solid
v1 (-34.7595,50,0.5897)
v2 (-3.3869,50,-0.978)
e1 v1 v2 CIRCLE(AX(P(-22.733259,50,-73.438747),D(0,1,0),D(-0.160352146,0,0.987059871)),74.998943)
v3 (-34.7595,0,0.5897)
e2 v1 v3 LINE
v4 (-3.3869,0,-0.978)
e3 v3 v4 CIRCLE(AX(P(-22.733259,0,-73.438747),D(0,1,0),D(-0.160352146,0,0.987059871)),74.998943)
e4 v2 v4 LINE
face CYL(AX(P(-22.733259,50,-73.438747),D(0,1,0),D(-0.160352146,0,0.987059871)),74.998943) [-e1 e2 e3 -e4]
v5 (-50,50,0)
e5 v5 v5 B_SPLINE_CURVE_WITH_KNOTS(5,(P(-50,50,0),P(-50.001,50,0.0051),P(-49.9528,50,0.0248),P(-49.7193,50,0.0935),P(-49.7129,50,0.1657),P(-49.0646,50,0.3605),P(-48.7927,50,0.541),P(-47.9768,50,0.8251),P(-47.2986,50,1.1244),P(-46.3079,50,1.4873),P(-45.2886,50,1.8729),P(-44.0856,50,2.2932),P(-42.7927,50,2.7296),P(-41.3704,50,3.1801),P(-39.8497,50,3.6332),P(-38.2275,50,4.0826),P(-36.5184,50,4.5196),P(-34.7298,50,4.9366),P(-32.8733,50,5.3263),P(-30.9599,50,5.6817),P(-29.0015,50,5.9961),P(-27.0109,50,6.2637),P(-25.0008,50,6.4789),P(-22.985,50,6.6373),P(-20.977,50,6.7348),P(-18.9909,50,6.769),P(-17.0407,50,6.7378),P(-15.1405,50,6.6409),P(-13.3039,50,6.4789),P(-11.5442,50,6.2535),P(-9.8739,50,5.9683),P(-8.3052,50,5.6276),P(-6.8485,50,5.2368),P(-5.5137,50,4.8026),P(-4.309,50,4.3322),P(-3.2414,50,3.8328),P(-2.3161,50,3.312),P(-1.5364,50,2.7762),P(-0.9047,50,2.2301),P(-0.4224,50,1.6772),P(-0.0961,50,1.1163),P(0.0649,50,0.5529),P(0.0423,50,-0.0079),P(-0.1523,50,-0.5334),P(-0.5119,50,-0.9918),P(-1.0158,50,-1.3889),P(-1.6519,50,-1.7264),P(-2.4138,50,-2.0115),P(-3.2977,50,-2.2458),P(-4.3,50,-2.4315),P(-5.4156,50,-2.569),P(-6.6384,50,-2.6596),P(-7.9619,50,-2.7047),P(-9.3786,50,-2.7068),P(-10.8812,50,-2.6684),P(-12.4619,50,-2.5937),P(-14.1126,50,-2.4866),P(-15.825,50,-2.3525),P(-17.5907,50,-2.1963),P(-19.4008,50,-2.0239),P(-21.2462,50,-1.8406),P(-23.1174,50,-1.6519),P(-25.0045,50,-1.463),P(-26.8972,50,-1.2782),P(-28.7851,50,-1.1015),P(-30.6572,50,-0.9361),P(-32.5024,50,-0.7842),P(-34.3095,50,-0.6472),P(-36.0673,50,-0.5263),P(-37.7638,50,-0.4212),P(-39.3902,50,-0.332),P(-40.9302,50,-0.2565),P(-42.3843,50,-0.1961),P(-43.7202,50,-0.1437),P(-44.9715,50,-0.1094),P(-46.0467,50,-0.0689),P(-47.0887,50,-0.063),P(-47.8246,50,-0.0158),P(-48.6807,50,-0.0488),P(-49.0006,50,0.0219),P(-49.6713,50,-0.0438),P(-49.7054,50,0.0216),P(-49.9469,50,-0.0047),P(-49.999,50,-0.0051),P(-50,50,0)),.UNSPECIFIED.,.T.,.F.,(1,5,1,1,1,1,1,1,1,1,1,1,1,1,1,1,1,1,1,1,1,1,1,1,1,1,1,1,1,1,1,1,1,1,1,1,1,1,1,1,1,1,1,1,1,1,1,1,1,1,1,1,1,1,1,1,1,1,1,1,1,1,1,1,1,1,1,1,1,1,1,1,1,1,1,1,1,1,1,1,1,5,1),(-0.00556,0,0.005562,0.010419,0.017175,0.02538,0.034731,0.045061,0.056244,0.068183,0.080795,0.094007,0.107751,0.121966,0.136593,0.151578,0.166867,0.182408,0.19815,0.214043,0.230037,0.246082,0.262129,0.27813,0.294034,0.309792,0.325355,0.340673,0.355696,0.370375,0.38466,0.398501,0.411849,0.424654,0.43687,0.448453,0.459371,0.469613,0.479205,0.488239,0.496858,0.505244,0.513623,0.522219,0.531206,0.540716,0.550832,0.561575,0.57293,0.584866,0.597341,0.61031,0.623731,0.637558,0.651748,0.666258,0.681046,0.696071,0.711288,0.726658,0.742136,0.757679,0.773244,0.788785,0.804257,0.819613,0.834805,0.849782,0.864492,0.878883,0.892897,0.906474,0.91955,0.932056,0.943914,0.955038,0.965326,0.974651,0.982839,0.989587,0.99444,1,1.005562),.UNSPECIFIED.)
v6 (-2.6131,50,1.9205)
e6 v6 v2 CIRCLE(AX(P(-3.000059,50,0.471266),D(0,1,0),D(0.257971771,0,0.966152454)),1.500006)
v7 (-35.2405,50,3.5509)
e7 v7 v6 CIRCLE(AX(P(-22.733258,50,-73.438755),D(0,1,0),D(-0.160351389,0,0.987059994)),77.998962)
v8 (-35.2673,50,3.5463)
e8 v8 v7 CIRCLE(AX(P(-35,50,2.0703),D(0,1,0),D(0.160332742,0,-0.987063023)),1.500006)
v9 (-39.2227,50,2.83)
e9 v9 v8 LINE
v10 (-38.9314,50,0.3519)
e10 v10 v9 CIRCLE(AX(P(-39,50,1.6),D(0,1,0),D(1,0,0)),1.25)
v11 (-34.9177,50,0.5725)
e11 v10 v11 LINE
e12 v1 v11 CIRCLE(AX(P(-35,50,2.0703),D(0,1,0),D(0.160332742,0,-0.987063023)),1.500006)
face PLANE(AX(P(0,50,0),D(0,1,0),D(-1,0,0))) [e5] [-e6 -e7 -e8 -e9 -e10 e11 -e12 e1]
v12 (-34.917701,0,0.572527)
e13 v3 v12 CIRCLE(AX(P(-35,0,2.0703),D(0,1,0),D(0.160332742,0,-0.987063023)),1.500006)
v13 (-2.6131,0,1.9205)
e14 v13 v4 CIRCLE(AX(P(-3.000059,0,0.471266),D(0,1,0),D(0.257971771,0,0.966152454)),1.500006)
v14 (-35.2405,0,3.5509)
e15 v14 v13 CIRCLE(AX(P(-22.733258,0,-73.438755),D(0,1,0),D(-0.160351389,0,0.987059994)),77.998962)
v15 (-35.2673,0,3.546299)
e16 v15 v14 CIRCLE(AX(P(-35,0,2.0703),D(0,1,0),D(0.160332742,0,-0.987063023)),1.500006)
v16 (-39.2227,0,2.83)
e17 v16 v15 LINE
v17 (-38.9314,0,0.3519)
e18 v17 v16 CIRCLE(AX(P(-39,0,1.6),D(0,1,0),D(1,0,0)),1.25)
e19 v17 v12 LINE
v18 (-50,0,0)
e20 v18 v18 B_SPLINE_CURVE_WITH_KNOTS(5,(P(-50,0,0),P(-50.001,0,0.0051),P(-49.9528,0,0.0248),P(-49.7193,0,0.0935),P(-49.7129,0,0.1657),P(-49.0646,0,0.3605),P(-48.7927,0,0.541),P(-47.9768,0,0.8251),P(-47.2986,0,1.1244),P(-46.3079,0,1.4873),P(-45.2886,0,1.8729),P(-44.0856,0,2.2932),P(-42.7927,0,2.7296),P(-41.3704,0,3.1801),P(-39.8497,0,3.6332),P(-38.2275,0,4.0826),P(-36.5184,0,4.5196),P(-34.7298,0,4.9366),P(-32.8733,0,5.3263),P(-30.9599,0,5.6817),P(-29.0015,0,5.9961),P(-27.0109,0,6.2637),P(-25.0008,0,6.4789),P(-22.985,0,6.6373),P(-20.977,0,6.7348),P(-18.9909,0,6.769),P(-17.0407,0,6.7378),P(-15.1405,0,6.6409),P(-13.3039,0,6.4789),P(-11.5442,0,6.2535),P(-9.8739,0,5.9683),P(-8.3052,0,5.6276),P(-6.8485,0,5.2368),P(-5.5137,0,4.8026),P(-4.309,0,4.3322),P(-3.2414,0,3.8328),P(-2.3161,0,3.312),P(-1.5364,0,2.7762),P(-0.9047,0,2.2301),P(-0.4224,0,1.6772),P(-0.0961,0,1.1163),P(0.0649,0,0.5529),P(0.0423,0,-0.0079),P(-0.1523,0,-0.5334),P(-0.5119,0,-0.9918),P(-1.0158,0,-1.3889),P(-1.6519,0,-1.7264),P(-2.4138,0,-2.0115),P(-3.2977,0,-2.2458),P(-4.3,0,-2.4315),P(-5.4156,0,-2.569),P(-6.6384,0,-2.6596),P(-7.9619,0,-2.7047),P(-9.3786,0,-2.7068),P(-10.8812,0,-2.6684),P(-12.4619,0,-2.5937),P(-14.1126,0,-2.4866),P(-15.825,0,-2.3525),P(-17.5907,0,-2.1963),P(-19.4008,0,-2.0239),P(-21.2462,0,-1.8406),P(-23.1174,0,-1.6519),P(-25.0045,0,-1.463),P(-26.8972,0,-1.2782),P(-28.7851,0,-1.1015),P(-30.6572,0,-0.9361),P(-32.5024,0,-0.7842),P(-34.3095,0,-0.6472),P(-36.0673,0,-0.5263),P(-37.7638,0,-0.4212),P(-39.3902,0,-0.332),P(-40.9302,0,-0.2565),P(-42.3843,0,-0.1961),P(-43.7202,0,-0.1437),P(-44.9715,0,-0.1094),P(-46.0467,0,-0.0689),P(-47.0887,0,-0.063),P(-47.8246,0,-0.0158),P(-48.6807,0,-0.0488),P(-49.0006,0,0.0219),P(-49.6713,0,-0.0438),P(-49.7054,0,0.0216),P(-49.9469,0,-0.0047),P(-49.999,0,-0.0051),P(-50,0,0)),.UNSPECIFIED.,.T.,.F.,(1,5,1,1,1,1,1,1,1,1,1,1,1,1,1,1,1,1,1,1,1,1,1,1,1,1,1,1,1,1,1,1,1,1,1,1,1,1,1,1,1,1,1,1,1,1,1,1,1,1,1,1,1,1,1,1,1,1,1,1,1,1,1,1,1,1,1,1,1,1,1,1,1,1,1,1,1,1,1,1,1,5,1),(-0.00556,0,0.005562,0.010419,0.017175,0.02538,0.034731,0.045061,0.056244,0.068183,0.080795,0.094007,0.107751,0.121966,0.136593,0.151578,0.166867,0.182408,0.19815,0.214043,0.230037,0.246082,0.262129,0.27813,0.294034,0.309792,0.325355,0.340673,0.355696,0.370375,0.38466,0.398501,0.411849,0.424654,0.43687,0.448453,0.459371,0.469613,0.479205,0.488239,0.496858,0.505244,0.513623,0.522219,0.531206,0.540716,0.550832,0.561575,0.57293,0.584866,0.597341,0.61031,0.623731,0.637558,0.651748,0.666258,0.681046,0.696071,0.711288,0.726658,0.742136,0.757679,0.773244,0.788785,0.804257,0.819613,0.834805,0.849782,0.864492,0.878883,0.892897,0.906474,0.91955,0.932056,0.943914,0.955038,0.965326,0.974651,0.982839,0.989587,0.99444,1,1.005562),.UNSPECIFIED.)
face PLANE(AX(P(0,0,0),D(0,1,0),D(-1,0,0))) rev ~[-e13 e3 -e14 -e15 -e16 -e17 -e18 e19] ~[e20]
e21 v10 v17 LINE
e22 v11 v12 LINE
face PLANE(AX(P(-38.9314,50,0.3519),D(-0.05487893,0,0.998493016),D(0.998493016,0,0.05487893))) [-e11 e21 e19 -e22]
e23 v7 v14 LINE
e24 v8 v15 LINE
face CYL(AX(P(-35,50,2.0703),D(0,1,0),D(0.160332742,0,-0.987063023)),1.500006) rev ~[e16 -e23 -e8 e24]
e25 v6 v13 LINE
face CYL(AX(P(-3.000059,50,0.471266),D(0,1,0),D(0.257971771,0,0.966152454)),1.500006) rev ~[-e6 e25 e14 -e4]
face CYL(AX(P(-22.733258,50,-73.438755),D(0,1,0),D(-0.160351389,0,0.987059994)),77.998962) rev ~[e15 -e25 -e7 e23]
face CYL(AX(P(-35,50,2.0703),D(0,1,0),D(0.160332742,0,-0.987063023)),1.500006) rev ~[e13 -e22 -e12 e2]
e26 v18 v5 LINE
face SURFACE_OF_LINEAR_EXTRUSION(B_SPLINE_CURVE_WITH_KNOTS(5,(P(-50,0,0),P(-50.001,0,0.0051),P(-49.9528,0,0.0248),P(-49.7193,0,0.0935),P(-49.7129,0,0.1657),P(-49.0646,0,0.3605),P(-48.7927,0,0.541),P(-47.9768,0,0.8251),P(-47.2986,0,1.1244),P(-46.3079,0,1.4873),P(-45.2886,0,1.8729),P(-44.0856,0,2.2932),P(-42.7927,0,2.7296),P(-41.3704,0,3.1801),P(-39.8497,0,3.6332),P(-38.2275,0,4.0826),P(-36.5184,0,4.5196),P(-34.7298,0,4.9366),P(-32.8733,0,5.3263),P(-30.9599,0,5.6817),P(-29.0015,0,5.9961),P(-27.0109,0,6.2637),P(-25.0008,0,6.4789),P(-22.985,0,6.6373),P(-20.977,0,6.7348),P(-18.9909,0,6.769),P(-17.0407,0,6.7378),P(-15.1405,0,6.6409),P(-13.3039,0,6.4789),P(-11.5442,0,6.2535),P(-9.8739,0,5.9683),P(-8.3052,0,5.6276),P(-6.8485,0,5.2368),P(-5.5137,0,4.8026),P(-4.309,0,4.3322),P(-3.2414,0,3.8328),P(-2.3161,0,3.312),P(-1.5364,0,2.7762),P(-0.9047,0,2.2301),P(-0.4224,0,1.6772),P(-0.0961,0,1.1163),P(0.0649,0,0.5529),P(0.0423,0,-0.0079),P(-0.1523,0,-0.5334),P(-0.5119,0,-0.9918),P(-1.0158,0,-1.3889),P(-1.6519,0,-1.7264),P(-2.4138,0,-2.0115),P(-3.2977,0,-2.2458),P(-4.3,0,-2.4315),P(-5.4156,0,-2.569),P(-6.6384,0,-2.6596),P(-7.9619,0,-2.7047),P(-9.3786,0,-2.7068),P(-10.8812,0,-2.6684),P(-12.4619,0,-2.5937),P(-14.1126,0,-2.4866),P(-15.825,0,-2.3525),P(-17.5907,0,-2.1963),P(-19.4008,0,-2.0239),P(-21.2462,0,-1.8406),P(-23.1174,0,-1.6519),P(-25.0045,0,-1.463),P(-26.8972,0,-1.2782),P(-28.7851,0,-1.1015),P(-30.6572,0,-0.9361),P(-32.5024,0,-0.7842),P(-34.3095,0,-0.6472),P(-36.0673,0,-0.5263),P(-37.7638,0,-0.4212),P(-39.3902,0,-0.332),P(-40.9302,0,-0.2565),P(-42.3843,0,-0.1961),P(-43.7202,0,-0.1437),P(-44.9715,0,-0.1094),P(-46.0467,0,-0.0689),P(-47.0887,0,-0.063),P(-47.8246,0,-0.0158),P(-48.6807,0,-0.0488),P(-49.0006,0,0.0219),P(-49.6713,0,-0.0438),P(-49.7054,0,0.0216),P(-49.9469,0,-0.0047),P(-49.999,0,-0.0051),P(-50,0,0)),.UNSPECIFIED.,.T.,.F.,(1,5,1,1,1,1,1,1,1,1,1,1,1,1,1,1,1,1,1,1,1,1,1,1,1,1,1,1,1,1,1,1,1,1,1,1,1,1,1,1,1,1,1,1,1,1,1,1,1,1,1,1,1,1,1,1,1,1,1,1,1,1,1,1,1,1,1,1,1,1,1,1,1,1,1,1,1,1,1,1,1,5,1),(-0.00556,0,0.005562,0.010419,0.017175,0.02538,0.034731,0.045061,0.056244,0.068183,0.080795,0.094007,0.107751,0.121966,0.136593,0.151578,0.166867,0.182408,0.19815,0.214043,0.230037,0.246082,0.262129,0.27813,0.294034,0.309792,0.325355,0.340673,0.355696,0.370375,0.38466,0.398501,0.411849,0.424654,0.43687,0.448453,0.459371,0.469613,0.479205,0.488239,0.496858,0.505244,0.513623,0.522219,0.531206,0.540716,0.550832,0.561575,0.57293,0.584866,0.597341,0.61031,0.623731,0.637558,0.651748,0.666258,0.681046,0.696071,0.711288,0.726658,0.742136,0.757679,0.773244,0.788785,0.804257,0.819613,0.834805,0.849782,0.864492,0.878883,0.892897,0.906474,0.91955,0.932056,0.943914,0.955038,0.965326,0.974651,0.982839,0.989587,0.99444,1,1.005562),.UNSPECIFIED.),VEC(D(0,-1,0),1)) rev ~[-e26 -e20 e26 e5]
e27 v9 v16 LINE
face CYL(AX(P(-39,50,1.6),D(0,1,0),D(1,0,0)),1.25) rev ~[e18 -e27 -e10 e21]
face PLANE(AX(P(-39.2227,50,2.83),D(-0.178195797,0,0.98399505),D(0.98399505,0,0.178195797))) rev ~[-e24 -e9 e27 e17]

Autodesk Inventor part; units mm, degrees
ref_plane "YZ Plane" through (0, 0, 0) normal (1, 0, 0) x (0, 1, 0)
ref_plane "XZ Plane" through (0, 0, 0) normal (0, 1, 0) x (-1, 0, 0)
ref_plane "XY Plane" through (0, 0, 0) normal (0, 0, 1) x (1, 0, 0)
sketch "草圖2" plane through (0, 0, 0) normal (0, 1, 0) x (-1, 0, 0)
  spline S0 degree 5 poles (50, 0) (50.001, 0.0051) (49.9528, 0.0248) (49.7193, 0.0935) (49.7129, 0.1657) (49.0646, 0.3605) (48.7927, 0.541) (47.9768, 0.8251) (47.2986, 1.1244) (46.3079, 1.4873) (45.2886, 1.8729) (44.0856, 2.2932) (42.7927, 2.7296) (41.3704, 3.1801) (39.8497, 3.6332) (38.2275, 4.0826) (36.5184, 4.5196) (34.7298, 4.9366) (32.8733, 5.3263) (30.9599, 5.6817) (29.0015, 5.9961) (27.0109, 6.2637) (25.0008, 6.4789) (22.985, 6.6373) (20.977, 6.7348) (18.9909, 6.769) (17.0407, 6.7378) (15.1405, 6.6409) (13.3039, 6.4789) (11.5442, 6.2535) (9.8739, 5.9683) (8.3052, 5.6276) (6.8485, 5.2368) (5.5137, 4.8026) (4.309, 4.3322) (3.2414, 3.8328) (2.3161, 3.312) (1.5364, 2.7762) (0.9047, 2.2301) (0.4224, 1.6772) (0.0961, 1.1163) (-0.0649, 0.5529) (-0.0423, -0.0079) (0.1523, -0.5334) (0.5119, -0.9918) (1.0158, -1.3889) (1.6519, -1.7264) (2.4138, -2.0115) (3.2977, -2.2458) (4.3, -2.4315) (5.4156, -2.569) (6.6384, -2.6596) (7.9619, -2.7047) (9.3786, -2.7068) (10.8812, -2.6684) (12.4619, -2.5937) (14.1126, -2.4866) (15.825, -2.3525) (17.5907, -2.1963) (19.4008, -2.0239) (21.2462, -1.8406) (23.1174, -1.6519) (25.0045, -1.463) (26.8972, -1.2782) (28.7851, -1.1015) (30.6572, -0.9361) (32.5024, -0.7842) (34.3095, -0.6472) (36.0673, -0.5263) (37.7638, -0.4212) (39.3902, -0.332) (40.9302, -0.2565) (42.3843, -0.1961) (43.7202, -0.1437) (44.9715, -0.1094) (46.0467, -0.0689) (47.0887, -0.063) (47.8246, -0.0158) (48.6807, -0.0488) (49.0006, 0.0219) (49.6713, -0.0438) (49.7054, 0.0216) (49.9469, -0.0047) (49.999, -0.0051) (50, 0) knots 0 0 0 0 0 0 0.005562 0.010419 0.017175 0.02538 0.034731 0.045061 0.056244 0.068183 0.080795 0.094007 0.107751 0.121966 0.136593 0.151578 0.166867 0.182408 0.19815 0.214043 0.230037 0.246082 0.262129 0.27813 0.294034 0.309792 0.325355 0.340673 0.355696 0.370375 0.38466 0.398501 0.411849 0.424654 0.43687 0.448453 0.459371 0.469613 0.479205 0.488239 0.496858 0.505244 0.513623 0.522219 0.531206 0.540716 0.550832 0.561575 0.57293 0.584866 0.597341 0.61031 0.623731 0.637558 0.651748 0.666258 0.681046 0.696071 0.711288 0.726658 0.742136 0.757679 0.773244 0.788785 0.804257 0.819613 0.834805 0.849782 0.864492 0.878883 0.892897 0.906474 0.91955 0.932056 0.943914 0.955038 0.965326 0.974651 0.982839 0.989587 0.99444 1 1 1 1 1 1
  point P0 (49.7052, 0.1268)
  point P1 (49.3378, 0.2828)
  point P2 (48.8255, 0.4967)
  point P3 (48.1705, 0.7643)
  point P4 (47.3758, 1.0802)
  point P5 (46.4449, 1.4382)
  point P6 (45.382, 1.8315)
  point P7 (44.1923, 2.2525)
  point P8 (42.8818, 2.6935)
  point P9 (41.4571, 3.1465)
  point P10 (39.9258, 3.6031)
  point P11 (38.2963, 4.0553)
  point P12 (36.5777, 4.4952)
  point P13 (34.7799, 4.9149)
  point P14 (32.9136, 5.3069)
  point P15 (30.9903, 5.6643)
  point P16 (29.0217, 5.9802)
  point P17 (27.0206, 6.2489)
  point P18 (25, 6.4646)
  point P19 (22.9736, 6.6229)
  point P20 (20.9552, 6.7199)
  point P21 (18.959, 6.7527)
  point P22 (16.9991, 6.7195)
  point P23 (15.0896, 6.6199)
  point P24 (13.2444, 6.4545)
  point P25 (11.477, 6.2251)
  point P26 (9.8, 5.9351)
  point P27 (8.2256, 5.5888)
  point P28 (6.7649, 5.192)
  point P29 (5.4277, 4.7509)
  point P30 (4.2229, 4.273)
  point P31 (3.1582, 3.7659)
  point P32 (2.2397, 3.2374)
  point P33 (1.4727, 2.6951)
  point P34 (0.8607, 2.1465)
  point P35 (0.4065, 1.5979)
  point P36 (0.1115, 1.0548)
  point P37 (-0.0238, 0.5212)
  point P38 (0, 0)
  point P39 (0.1779, -0.4904)
  point P40 (0.5041, -0.9324)
  point P41 (0.975, -1.3254)
  point P42 (1.5865, -1.669)
  point P43 (2.3333, -1.9629)
  point P44 (3.2099, -2.2069)
  point P45 (4.2098, -2.4009)
  point P46 (5.3262, -2.5456)
  point P47 (6.552, -2.6421)
  point P48 (7.8798, -2.692)
  point P49 (9.3019, -2.6978)
  point P50 (10.8107, -2.6625)
  point P51 (12.3982, -2.5901)
  point P52 (14.0561, -2.485)
  point P53 (15.7763, -2.3521)
  point P54 (17.5501, -2.197)
  point P55 (19.3688, -2.0252)
  point P56 (21.2231, -1.8422)
  point P57 (23.1034, -1.6536)
  point P58 (25, -1.4646)
  point P59 (26.9024, -1.2796)
  point P60 (28.8001, -1.1026)
  point P61 (30.6821, -0.9368)
  point P62 (32.5372, -0.7844)
  point P63 (34.3543, -0.6471)
  point P64 (36.1218, -0.5257)
  point P65 (37.8286, -0.4204)
  point P66 (39.4634, -0.3306)
  point P67 (41.0153, -0.2554)
  point P68 (42.4735, -0.1935)
  point P69 (43.828, -0.1436)
  point P70 (45.0688, -0.104)
  point P71 (46.1872, -0.0732)
  point P72 (47.1745, -0.0497)
  point P73 (48.0234, -0.0321)
  point P74 (48.7274, -0.0192)
  point P75 (49.2807, -0.0103)
  point P76 (49.6793, -0.0044)
  point P77 (49.9197, -0.0011)
extrude "擠出1" add sketch "草圖2" along normal blind 50
sketch "草圖3" plane through (0, 50, 0) normal (0, 1, 0) x (1, 0, 0)
  arc A0 (-35, -2.0703) -> (-3, -0.4713) centre (-22.7332, 73.4398) ccw construction
  arc A1 (-35.2405, -3.5509) -> (-2.6131, -1.9205) centre (-22.7332, 73.4398) ccw
  arc A2 (-34.7595, -0.5897) -> (-3.3869, 0.978) centre (-22.7332, 73.4398) ccw
  arc A3 (-34.7595, -0.5897) -> (-35.2405, -3.5509) centre (-35, -2.0703) ccw
  arc A4 (-2.6131, -1.9205) -> (-3.3869, 0.978) centre (-3, -0.4713) ccw
  line L0 (0, 89.4816) -> (0, -22.8108) projected
  dimension "d3" = 1.5
  dimension "d5" = 3
  dimension "d6" = 32
extrude "擠出2" cut sketch "草圖3" against normal through all
sketch "草圖4" plane through (0, 50, 0) normal (0, 1, 0) x (1, 0, 0)
  arc A0 (-34.7595, -0.5897) -> (-35.2405, -3.5509) centre (-35, -2.0703) ccw projected
  arc A1 (-35.2405, -3.5509) -> (-2.6131, -1.9205) centre (-22.7332, 73.4398) ccw projected
  arc A2 (-34.7595, -0.5897) -> (-3.3869, 0.978) centre (-22.7332, 73.4398) ccw projected
  circle A3 centre (-39, -1.6) radius 1.25
  line L0 (-60.0142, 0) -> (10.0781, 0) projected
  line L1 (-39.2227, -2.83) -> (-35.2673, -3.5463)
  line L2 (-38.9314, -0.3519) -> (-34.9177, -0.5725)
  point P0 (0, 0)
  dimension "d12" = 2.5
  dimension "d13" = 4
  dimension "d14" = 1.6
extrude "擠出3" cut sketch "草圖4" against normal through all
properties part number "5518"
